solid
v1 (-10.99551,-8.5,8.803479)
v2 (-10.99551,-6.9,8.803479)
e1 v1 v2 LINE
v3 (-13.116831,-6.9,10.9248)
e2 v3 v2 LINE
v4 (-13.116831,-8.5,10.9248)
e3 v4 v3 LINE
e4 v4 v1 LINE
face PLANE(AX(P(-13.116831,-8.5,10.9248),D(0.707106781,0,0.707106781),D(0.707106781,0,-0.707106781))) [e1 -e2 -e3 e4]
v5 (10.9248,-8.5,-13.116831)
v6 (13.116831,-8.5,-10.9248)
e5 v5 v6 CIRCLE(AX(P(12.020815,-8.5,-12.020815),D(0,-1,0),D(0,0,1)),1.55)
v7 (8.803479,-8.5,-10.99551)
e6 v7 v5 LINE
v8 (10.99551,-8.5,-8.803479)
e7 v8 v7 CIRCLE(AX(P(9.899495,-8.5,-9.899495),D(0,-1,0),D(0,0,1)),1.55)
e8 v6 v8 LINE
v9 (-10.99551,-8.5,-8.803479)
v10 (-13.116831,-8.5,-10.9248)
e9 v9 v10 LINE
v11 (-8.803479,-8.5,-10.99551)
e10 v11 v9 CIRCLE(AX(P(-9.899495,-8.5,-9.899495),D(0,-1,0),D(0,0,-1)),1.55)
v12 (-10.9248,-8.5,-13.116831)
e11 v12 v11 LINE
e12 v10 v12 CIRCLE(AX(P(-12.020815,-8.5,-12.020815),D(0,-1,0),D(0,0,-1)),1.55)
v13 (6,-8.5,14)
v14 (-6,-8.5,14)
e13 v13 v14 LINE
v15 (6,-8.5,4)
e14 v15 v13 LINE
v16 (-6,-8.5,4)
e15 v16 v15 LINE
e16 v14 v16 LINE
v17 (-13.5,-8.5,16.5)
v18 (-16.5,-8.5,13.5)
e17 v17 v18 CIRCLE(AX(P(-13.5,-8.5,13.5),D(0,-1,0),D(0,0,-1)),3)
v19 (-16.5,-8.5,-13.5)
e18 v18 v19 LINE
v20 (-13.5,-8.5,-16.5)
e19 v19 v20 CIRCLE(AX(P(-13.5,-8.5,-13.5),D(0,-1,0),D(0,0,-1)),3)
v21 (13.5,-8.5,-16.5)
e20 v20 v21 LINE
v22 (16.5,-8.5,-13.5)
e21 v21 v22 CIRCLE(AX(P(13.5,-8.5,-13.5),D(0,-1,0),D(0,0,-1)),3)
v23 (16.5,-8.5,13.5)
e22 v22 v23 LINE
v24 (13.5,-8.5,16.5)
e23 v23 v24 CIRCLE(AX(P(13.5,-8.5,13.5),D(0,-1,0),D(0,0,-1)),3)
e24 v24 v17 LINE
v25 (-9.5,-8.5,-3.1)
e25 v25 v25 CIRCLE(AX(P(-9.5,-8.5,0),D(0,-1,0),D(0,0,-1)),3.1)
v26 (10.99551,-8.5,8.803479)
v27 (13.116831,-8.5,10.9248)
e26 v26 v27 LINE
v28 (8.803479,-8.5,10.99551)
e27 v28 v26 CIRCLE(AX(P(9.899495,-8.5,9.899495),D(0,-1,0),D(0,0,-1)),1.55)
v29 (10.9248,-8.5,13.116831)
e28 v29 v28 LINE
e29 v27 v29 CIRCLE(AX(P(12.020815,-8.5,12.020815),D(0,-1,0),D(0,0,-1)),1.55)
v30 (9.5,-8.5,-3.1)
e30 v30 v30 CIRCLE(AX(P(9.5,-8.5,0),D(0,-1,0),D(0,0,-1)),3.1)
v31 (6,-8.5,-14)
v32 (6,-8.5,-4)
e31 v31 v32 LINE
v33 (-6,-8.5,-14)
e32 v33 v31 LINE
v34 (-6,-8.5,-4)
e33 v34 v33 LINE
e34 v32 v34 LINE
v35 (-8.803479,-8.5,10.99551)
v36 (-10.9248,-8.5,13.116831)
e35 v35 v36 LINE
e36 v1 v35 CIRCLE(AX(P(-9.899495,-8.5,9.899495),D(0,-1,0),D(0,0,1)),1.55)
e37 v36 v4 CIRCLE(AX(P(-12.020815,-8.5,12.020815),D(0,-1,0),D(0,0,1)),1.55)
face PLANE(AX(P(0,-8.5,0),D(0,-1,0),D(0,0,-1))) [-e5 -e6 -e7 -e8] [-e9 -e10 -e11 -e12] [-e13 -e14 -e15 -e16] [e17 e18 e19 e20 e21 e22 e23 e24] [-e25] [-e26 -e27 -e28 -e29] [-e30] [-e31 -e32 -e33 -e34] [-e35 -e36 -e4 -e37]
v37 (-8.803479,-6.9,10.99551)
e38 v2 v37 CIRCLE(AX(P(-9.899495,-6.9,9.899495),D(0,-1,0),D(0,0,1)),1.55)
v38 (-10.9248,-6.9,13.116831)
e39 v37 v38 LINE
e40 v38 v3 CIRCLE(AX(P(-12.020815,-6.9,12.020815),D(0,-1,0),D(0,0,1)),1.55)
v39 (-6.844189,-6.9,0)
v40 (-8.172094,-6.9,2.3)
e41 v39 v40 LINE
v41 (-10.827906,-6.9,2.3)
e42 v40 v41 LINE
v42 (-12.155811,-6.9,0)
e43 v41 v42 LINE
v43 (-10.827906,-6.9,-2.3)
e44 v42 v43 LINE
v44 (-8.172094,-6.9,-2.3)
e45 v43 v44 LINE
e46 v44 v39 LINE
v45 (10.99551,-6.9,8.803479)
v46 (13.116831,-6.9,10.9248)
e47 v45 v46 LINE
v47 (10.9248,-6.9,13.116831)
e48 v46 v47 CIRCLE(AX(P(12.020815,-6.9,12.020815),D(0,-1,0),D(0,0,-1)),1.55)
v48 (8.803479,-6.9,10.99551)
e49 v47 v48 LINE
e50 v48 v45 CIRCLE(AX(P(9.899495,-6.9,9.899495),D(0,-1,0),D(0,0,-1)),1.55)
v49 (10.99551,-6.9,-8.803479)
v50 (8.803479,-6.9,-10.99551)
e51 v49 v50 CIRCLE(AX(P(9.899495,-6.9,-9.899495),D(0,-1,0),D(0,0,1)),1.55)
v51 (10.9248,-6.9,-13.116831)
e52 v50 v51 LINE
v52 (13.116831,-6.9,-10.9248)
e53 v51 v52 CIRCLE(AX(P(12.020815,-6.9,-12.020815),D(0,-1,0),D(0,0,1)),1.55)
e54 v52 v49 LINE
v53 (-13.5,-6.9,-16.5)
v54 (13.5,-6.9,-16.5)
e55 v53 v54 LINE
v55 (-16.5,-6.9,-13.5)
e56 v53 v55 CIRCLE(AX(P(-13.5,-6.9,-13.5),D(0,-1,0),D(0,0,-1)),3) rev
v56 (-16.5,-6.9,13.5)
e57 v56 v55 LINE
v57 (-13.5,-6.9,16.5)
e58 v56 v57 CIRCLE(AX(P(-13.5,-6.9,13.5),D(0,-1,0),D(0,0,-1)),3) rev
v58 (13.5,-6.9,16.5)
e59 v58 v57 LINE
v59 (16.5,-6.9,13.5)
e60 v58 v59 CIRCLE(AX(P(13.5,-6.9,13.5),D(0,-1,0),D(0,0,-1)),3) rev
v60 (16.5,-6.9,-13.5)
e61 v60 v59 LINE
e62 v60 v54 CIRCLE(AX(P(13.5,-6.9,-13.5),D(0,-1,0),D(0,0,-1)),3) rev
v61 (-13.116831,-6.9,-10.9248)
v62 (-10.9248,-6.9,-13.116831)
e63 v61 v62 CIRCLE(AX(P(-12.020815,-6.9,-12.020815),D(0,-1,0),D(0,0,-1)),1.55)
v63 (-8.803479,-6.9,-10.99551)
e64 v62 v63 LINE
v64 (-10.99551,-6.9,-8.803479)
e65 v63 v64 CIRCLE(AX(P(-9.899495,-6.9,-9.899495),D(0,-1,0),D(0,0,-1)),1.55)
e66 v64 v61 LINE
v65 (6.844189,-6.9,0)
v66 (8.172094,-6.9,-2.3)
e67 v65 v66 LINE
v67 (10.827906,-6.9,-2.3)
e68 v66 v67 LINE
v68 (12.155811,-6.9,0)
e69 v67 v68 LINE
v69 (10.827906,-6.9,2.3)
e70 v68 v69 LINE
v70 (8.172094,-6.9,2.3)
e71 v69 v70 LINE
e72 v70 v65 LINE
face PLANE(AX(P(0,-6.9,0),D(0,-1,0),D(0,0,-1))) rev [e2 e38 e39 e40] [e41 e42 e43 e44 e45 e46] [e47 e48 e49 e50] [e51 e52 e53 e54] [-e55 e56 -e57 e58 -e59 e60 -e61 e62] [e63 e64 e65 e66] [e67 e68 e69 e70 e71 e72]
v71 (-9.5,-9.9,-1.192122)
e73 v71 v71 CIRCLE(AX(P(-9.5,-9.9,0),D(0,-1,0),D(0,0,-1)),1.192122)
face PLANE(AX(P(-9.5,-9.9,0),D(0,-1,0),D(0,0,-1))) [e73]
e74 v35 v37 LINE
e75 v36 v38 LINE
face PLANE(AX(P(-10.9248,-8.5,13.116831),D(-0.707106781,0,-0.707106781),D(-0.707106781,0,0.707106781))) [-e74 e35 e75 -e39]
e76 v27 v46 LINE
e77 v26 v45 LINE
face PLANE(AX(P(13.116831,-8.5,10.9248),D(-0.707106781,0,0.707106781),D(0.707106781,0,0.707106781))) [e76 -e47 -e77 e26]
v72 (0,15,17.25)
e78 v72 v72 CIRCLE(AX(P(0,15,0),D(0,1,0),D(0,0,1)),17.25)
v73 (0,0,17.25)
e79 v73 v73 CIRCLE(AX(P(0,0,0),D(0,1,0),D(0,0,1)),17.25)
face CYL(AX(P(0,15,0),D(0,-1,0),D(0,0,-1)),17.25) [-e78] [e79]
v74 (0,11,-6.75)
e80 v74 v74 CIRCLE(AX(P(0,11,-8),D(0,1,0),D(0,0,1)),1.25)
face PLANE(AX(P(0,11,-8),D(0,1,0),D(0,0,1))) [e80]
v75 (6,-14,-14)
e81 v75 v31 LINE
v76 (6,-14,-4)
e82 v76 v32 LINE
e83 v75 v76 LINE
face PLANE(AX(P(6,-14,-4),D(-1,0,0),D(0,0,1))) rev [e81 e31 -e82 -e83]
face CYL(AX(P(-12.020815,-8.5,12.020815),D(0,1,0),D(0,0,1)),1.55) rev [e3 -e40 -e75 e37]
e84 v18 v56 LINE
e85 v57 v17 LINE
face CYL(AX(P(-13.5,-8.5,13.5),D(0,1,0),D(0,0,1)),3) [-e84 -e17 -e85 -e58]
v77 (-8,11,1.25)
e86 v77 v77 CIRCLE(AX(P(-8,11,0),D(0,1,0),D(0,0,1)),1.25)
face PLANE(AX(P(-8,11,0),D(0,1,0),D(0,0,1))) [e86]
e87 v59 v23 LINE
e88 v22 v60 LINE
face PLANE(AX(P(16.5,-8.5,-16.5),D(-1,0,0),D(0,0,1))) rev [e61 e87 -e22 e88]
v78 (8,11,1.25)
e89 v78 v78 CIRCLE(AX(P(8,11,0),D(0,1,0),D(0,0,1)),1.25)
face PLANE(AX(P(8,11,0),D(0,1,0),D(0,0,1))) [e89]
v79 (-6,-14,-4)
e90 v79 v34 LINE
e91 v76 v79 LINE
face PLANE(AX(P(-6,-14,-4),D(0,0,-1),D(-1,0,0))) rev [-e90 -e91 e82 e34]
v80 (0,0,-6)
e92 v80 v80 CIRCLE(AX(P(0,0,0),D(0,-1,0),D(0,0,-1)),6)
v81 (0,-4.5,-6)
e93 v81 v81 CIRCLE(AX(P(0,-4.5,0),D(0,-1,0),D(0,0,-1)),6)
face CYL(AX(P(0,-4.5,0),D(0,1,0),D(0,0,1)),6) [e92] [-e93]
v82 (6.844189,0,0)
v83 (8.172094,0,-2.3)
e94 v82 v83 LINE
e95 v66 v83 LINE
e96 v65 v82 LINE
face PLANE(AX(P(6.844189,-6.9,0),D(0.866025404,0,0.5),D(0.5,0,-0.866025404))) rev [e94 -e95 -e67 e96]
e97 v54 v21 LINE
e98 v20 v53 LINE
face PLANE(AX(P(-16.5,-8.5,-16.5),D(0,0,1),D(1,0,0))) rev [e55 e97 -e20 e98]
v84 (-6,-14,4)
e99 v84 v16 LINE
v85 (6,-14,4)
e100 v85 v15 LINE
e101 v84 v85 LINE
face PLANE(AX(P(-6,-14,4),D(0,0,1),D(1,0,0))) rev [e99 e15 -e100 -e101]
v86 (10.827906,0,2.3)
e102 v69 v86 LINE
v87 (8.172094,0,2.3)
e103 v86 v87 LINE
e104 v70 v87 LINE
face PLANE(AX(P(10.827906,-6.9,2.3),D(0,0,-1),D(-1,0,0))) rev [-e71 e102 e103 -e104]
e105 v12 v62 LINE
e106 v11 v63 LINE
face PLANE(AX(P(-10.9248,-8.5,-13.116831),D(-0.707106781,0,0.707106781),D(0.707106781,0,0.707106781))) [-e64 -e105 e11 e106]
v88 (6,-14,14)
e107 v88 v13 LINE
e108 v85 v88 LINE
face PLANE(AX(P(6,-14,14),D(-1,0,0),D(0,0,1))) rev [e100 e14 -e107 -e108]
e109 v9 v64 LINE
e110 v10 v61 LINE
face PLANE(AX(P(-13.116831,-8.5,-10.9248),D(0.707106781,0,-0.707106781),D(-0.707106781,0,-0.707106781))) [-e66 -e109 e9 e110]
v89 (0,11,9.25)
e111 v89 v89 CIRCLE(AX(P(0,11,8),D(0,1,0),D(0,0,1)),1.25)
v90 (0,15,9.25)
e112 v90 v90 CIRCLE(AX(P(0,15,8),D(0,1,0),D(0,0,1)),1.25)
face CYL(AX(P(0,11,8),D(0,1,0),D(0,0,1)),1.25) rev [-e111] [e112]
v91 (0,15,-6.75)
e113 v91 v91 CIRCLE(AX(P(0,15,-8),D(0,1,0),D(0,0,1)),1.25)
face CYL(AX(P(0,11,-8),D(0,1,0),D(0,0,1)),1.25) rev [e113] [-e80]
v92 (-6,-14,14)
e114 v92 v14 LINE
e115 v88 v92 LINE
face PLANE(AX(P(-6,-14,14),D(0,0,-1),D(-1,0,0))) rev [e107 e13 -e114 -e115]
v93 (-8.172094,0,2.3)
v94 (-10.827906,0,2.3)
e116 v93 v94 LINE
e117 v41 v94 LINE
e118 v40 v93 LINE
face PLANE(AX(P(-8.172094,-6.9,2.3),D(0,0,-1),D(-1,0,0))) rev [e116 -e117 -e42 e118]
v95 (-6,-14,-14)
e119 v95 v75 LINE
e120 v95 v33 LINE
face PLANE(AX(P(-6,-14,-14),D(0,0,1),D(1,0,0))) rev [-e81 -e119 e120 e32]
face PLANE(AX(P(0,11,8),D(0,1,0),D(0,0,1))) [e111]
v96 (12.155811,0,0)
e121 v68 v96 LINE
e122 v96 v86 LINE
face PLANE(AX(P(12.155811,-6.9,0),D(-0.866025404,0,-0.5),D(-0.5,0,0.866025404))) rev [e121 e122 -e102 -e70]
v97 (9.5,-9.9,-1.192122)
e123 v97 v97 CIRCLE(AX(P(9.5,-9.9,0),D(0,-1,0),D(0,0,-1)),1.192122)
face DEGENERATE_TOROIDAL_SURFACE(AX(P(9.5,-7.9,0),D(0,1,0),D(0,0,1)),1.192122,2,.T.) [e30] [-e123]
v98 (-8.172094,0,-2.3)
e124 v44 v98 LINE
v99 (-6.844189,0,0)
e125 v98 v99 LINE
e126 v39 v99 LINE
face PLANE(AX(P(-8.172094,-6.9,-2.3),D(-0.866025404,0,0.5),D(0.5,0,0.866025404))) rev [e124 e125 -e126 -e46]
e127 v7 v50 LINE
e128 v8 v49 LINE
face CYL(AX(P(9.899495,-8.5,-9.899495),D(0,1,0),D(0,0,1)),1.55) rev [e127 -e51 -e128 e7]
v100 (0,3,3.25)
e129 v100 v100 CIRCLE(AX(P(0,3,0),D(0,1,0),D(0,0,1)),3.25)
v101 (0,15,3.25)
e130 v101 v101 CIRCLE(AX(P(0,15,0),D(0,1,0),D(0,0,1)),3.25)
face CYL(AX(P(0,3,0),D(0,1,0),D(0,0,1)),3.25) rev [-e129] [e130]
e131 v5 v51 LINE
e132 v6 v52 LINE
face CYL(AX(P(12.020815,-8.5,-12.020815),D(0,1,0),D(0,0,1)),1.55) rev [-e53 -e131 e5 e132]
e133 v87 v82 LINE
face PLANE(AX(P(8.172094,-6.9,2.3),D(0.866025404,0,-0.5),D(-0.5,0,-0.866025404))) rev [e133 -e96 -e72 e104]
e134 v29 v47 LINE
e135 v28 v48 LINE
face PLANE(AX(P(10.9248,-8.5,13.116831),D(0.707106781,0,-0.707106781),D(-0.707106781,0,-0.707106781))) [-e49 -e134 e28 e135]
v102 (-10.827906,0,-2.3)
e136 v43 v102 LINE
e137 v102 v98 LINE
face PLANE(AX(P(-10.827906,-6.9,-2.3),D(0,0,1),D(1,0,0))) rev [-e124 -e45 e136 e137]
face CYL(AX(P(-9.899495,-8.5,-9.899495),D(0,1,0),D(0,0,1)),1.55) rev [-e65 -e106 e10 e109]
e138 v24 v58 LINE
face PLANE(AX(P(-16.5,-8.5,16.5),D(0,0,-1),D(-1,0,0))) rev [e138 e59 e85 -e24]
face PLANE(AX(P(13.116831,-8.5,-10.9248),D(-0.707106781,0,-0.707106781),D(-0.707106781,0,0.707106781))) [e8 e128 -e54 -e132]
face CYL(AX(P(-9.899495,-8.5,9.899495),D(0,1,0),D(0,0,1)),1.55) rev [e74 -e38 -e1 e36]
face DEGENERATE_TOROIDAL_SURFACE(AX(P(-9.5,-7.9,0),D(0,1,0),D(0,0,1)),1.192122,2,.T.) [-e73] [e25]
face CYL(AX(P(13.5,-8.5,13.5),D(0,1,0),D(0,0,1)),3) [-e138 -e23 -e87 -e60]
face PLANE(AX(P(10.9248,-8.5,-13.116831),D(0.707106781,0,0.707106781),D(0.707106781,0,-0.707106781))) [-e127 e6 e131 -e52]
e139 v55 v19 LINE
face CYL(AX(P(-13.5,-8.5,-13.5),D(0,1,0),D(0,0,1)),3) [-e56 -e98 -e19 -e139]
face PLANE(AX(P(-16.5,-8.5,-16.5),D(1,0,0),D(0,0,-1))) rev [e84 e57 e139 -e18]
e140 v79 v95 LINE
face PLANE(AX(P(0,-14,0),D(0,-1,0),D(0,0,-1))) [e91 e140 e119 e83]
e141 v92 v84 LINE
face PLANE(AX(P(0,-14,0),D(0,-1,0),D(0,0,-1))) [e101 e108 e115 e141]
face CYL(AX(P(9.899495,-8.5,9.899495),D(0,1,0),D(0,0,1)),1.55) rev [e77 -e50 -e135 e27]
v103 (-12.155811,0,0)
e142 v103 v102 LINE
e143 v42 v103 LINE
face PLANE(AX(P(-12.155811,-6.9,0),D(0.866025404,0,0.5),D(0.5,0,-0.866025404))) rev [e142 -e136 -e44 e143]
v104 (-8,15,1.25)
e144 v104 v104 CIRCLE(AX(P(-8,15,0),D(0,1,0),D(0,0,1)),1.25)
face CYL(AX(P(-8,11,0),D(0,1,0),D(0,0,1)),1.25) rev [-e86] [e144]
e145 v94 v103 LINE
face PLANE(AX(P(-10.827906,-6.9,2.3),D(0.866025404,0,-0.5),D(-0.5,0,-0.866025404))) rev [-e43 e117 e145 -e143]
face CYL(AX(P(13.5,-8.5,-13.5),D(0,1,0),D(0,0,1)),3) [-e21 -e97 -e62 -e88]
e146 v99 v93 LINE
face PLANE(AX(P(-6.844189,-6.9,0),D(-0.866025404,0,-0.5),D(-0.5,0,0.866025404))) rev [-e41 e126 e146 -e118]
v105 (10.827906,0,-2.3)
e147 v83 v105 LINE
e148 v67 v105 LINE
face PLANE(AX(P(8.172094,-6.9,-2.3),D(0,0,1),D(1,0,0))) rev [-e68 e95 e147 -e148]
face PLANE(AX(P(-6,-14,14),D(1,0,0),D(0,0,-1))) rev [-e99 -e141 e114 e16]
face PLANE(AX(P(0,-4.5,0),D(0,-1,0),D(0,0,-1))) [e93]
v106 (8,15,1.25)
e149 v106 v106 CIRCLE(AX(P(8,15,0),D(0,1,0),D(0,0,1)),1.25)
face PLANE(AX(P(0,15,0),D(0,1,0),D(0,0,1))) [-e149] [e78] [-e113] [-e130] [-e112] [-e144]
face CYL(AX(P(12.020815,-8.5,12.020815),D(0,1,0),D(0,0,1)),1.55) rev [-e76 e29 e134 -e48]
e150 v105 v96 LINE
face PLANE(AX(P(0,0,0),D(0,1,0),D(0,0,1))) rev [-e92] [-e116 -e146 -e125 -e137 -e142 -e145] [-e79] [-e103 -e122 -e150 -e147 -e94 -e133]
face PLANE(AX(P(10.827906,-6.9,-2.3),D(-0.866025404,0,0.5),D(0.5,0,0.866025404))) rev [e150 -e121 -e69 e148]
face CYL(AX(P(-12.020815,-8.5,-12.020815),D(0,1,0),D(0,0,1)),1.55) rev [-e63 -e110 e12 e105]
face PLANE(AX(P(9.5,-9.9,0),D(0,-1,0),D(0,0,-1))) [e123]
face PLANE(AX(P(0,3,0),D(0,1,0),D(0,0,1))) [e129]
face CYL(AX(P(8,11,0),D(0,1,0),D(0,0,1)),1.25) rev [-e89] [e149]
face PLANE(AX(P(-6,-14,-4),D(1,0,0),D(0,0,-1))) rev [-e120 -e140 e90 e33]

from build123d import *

# Parameters (mm, degrees)
SKETCH1_R           = 17.25
BOSS_EXTRUDE1_DEPTH = 15
SKETCH2_R           = 6
BOSS_EXTRUDE2_DEPTH = 4.5
BOSS_EXTRUDE3_DEPTH = 6.9
SKETCH4_W           = 33
SKETCH4_H           = 33
BOSS_EXTRUDE4_DEPTH = 1.6
FILLET1_R           = 3
SKETCH9_W           = 12
SKETCH9_H           = 10
BOSS_EXTRUDE6_DEPTH = 5.5
SKETCH10_R          = 1.25
CUT_EXTRUDE1_DEPTH  = 4
SKETCH11_R          = 3.1
BOSS_EXTRUDE7_DEPTH = 1.4
FILLET2_R           = 2
SKETCH12_R          = 3.25
CUT_EXTRUDE2_DEPTH  = 12


with BuildPart() as part:
    # Sketch1 → Boss-Extrude1 (new body)
    with BuildSketch(Plane(origin=(0, 0, 0), x_dir=(1, 0, 0), z_dir=(0, 1, 0))):
        with Locations(Location((0, 0, 0), (0, 0, 270))):
            Circle(SKETCH1_R)
    extrude(amount=BOSS_EXTRUDE1_DEPTH)

    # Sketch2 → Boss-Extrude2 (add)
    with BuildSketch(Plane.XZ):
        with Locations(Location((0, 0, 0), (0, 0, 270))):
            Circle(SKETCH2_R)
    extrude(amount=BOSS_EXTRUDE2_DEPTH)

    # Sketch3 → Boss-Extrude3 (add)
    with BuildSketch(Plane.XZ):
        Polygon((-6.844188762, 0), (-8.172094381, 2.3), (-10.827905619, 2.3), (-12.155811238, 0), (-10.827905619, -2.3), (-8.172094381, -2.3), align=None)
        Polygon((12.155811238, 0), (10.827905619, 2.3), (8.172094381, 2.3), (6.844188762, 0), (8.172094381, -2.3), (10.827905619, -2.3), align=None)
    extrude(amount=BOSS_EXTRUDE3_DEPTH)

    # Sketch4 → Boss-Extrude4 (add)
    with BuildSketch(Plane.XZ.offset(6.9)):
        Rectangle(SKETCH4_W, SKETCH4_H)
        with BuildLine():
            Line((-13.116830791, -10.924799769), (-10.995510447, -8.803479426))
            ThreePointArc((-10.995510447, -8.803479426), (-8.803479426, -8.803479426), (-8.803479426, -10.995510447))
            Line((-8.803479426, -10.995510447), (-10.924799769, -13.116830791))
            ThreePointArc((-10.924799769, -13.116830791), (-13.116830791, -13.116830791), (-13.116830791, -10.924799769))
        make_face(mode=Mode.SUBTRACT)
        with BuildLine():
            Line((-13.116830791, 10.924799769), (-10.995510447, 8.803479426))
            ThreePointArc((-10.995510447, 8.803479426), (-8.803479426, 8.803479426), (-8.803479426, 10.995510447))
            Line((-8.803479426, 10.995510447), (-10.924799769, 13.116830791))
            ThreePointArc((-10.924799769, 13.116830791), (-13.116830791, 13.116830791), (-13.116830791, 10.924799769))
        make_face(mode=Mode.SUBTRACT)
        with BuildLine():
            Line((13.116830791, -10.924799769), (10.995510447, -8.803479426))
            ThreePointArc((10.995510447, -8.803479426), (8.803479426, -8.803479426), (8.803479426, -10.995510447))
            Line((8.803479426, -10.995510447), (10.924799769, -13.116830791))
            ThreePointArc((10.924799769, -13.116830791), (13.116830791, -13.116830791), (13.116830791, -10.924799769))
        make_face(mode=Mode.SUBTRACT)
        with BuildLine():
            Line((13.116830791, 10.924799769), (10.995510447, 8.803479426))
            ThreePointArc((10.995510447, 8.803479426), (8.803479426, 8.803479426), (8.803479426, 10.995510447))
            Line((8.803479426, 10.995510447), (10.924799769, 13.116830791))
            ThreePointArc((10.924799769, 13.116830791), (13.116830791, 13.116830791), (13.116830791, 10.924799769))
        make_face(mode=Mode.SUBTRACT)
    extrude(amount=BOSS_EXTRUDE4_DEPTH)

    # Fillet1
    fillet1_edges = [part.edges().sort_by_distance(p)[0] for p in [
        (-16.5, -7.7, -16.5),
        (16.5, -7.7, -16.5),
        (16.5, -7.7, 16.5),
        (-16.5, -7.7, 16.5),
    ]]
    fillet(fillet1_edges, radius=FILLET1_R)

    # Sketch9 → Boss-Extrude6 (add)
    with BuildSketch(Plane.XZ.offset(8.5)):
        with Locations((0, 9)):
            Rectangle(SKETCH9_W, SKETCH9_H)
        with Locations((0, -9)):
            Rectangle(SKETCH9_W, SKETCH9_H)
    extrude(amount=BOSS_EXTRUDE6_DEPTH)

    # Sketch10 → Cut-Extrude1 (cut)
    with BuildSketch(Plane(origin=(0, 15, 0), x_dir=(1, 0, 0), z_dir=(0, 1, 0))):
        with Locations(Location((0, 8, 0), (0, 0, 270))):
            Circle(SKETCH10_R)
        with Locations(Location((8, 0, 0), (0, 0, 270))):
            Circle(SKETCH10_R)
        with Locations(Location((0, -8, 0), (0, 0, 270))):
            Circle(SKETCH10_R)
        with Locations(Location((-8, 0, 0), (0, 0, 270))):
            Circle(SKETCH10_R)
    extrude(amount=-CUT_EXTRUDE1_DEPTH, mode=Mode.SUBTRACT)

    # Sketch11 → Boss-Extrude7 (add)
    with BuildSketch(Plane.XZ.offset(8.5)):
        with Locations(Location((-9.5, 0, 0), (0, 0, 270))):
            Circle(SKETCH11_R)
        with Locations(Location((9.5, 0, 0), (0, 0, 270))):
            Circle(SKETCH11_R)
    extrude(amount=BOSS_EXTRUDE7_DEPTH)

    # Fillet2
    # the kernel refuses this fillet: 2 mm, written as the material it takes off along each edge
    with BuildSketch(Plane(origin=(-9.5, -9.9, 0), x_dir=(0, 0, -1), z_dir=(-1, 0, 0))) as fillet2_piece_1:
        with BuildLine():
            CenterArc((1.192121597, -2), FILLET2_R, 17.457603124, 72.542396876)
            Line((1.192121597, 0), (1.192121597, 0.04))
            Line((1.192121597, 0.04), (3.1, 0.04))
            Line((3.1, 0.04), (3.14, 0))
            ThreePointArc((3.14, 0), (3.14, -0.7), (3.138157568, -1.388))
            Line((3.138157568, -1.388), (3.1, -1.4))
        make_face()
    revolve(axis=Axis((-9.5, -9.9, 0), (0, -1, 0)), mode=Mode.SUBTRACT)
    with BuildSketch(Plane(origin=(9.5, -9.9, 0), x_dir=(0, 0, -1), z_dir=(-1, 0, 0))) as fillet2_piece_2:
        with BuildLine():
            CenterArc((1.192121597, -2), FILLET2_R, 17.457603124, 72.542396876)
            Line((1.192121597, 0), (1.192121597, 0.04))
            Line((1.192121597, 0.04), (3.1, 0.04))
            Line((3.1, 0.04), (3.14, 0))
            ThreePointArc((3.14, 0), (3.14, -0.7), (3.138157568, -1.388))
            Line((3.138157568, -1.388), (3.1, -1.4))
        make_face()
    revolve(axis=Axis((9.5, -9.9, 0), (0, -1, 0)), mode=Mode.SUBTRACT)

    # Sketch12 → Cut-Extrude2 (cut)
    with BuildSketch(Plane(origin=(0, 15, 0), x_dir=(1, 0, 0), z_dir=(0, 1, 0))):
        with Locations(Location((0, 0, 0), (0, 0, 270))):
            Circle(SKETCH12_R)
    extrude(amount=-CUT_EXTRUDE2_DEPTH, mode=Mode.SUBTRACT)


solid = part.part
